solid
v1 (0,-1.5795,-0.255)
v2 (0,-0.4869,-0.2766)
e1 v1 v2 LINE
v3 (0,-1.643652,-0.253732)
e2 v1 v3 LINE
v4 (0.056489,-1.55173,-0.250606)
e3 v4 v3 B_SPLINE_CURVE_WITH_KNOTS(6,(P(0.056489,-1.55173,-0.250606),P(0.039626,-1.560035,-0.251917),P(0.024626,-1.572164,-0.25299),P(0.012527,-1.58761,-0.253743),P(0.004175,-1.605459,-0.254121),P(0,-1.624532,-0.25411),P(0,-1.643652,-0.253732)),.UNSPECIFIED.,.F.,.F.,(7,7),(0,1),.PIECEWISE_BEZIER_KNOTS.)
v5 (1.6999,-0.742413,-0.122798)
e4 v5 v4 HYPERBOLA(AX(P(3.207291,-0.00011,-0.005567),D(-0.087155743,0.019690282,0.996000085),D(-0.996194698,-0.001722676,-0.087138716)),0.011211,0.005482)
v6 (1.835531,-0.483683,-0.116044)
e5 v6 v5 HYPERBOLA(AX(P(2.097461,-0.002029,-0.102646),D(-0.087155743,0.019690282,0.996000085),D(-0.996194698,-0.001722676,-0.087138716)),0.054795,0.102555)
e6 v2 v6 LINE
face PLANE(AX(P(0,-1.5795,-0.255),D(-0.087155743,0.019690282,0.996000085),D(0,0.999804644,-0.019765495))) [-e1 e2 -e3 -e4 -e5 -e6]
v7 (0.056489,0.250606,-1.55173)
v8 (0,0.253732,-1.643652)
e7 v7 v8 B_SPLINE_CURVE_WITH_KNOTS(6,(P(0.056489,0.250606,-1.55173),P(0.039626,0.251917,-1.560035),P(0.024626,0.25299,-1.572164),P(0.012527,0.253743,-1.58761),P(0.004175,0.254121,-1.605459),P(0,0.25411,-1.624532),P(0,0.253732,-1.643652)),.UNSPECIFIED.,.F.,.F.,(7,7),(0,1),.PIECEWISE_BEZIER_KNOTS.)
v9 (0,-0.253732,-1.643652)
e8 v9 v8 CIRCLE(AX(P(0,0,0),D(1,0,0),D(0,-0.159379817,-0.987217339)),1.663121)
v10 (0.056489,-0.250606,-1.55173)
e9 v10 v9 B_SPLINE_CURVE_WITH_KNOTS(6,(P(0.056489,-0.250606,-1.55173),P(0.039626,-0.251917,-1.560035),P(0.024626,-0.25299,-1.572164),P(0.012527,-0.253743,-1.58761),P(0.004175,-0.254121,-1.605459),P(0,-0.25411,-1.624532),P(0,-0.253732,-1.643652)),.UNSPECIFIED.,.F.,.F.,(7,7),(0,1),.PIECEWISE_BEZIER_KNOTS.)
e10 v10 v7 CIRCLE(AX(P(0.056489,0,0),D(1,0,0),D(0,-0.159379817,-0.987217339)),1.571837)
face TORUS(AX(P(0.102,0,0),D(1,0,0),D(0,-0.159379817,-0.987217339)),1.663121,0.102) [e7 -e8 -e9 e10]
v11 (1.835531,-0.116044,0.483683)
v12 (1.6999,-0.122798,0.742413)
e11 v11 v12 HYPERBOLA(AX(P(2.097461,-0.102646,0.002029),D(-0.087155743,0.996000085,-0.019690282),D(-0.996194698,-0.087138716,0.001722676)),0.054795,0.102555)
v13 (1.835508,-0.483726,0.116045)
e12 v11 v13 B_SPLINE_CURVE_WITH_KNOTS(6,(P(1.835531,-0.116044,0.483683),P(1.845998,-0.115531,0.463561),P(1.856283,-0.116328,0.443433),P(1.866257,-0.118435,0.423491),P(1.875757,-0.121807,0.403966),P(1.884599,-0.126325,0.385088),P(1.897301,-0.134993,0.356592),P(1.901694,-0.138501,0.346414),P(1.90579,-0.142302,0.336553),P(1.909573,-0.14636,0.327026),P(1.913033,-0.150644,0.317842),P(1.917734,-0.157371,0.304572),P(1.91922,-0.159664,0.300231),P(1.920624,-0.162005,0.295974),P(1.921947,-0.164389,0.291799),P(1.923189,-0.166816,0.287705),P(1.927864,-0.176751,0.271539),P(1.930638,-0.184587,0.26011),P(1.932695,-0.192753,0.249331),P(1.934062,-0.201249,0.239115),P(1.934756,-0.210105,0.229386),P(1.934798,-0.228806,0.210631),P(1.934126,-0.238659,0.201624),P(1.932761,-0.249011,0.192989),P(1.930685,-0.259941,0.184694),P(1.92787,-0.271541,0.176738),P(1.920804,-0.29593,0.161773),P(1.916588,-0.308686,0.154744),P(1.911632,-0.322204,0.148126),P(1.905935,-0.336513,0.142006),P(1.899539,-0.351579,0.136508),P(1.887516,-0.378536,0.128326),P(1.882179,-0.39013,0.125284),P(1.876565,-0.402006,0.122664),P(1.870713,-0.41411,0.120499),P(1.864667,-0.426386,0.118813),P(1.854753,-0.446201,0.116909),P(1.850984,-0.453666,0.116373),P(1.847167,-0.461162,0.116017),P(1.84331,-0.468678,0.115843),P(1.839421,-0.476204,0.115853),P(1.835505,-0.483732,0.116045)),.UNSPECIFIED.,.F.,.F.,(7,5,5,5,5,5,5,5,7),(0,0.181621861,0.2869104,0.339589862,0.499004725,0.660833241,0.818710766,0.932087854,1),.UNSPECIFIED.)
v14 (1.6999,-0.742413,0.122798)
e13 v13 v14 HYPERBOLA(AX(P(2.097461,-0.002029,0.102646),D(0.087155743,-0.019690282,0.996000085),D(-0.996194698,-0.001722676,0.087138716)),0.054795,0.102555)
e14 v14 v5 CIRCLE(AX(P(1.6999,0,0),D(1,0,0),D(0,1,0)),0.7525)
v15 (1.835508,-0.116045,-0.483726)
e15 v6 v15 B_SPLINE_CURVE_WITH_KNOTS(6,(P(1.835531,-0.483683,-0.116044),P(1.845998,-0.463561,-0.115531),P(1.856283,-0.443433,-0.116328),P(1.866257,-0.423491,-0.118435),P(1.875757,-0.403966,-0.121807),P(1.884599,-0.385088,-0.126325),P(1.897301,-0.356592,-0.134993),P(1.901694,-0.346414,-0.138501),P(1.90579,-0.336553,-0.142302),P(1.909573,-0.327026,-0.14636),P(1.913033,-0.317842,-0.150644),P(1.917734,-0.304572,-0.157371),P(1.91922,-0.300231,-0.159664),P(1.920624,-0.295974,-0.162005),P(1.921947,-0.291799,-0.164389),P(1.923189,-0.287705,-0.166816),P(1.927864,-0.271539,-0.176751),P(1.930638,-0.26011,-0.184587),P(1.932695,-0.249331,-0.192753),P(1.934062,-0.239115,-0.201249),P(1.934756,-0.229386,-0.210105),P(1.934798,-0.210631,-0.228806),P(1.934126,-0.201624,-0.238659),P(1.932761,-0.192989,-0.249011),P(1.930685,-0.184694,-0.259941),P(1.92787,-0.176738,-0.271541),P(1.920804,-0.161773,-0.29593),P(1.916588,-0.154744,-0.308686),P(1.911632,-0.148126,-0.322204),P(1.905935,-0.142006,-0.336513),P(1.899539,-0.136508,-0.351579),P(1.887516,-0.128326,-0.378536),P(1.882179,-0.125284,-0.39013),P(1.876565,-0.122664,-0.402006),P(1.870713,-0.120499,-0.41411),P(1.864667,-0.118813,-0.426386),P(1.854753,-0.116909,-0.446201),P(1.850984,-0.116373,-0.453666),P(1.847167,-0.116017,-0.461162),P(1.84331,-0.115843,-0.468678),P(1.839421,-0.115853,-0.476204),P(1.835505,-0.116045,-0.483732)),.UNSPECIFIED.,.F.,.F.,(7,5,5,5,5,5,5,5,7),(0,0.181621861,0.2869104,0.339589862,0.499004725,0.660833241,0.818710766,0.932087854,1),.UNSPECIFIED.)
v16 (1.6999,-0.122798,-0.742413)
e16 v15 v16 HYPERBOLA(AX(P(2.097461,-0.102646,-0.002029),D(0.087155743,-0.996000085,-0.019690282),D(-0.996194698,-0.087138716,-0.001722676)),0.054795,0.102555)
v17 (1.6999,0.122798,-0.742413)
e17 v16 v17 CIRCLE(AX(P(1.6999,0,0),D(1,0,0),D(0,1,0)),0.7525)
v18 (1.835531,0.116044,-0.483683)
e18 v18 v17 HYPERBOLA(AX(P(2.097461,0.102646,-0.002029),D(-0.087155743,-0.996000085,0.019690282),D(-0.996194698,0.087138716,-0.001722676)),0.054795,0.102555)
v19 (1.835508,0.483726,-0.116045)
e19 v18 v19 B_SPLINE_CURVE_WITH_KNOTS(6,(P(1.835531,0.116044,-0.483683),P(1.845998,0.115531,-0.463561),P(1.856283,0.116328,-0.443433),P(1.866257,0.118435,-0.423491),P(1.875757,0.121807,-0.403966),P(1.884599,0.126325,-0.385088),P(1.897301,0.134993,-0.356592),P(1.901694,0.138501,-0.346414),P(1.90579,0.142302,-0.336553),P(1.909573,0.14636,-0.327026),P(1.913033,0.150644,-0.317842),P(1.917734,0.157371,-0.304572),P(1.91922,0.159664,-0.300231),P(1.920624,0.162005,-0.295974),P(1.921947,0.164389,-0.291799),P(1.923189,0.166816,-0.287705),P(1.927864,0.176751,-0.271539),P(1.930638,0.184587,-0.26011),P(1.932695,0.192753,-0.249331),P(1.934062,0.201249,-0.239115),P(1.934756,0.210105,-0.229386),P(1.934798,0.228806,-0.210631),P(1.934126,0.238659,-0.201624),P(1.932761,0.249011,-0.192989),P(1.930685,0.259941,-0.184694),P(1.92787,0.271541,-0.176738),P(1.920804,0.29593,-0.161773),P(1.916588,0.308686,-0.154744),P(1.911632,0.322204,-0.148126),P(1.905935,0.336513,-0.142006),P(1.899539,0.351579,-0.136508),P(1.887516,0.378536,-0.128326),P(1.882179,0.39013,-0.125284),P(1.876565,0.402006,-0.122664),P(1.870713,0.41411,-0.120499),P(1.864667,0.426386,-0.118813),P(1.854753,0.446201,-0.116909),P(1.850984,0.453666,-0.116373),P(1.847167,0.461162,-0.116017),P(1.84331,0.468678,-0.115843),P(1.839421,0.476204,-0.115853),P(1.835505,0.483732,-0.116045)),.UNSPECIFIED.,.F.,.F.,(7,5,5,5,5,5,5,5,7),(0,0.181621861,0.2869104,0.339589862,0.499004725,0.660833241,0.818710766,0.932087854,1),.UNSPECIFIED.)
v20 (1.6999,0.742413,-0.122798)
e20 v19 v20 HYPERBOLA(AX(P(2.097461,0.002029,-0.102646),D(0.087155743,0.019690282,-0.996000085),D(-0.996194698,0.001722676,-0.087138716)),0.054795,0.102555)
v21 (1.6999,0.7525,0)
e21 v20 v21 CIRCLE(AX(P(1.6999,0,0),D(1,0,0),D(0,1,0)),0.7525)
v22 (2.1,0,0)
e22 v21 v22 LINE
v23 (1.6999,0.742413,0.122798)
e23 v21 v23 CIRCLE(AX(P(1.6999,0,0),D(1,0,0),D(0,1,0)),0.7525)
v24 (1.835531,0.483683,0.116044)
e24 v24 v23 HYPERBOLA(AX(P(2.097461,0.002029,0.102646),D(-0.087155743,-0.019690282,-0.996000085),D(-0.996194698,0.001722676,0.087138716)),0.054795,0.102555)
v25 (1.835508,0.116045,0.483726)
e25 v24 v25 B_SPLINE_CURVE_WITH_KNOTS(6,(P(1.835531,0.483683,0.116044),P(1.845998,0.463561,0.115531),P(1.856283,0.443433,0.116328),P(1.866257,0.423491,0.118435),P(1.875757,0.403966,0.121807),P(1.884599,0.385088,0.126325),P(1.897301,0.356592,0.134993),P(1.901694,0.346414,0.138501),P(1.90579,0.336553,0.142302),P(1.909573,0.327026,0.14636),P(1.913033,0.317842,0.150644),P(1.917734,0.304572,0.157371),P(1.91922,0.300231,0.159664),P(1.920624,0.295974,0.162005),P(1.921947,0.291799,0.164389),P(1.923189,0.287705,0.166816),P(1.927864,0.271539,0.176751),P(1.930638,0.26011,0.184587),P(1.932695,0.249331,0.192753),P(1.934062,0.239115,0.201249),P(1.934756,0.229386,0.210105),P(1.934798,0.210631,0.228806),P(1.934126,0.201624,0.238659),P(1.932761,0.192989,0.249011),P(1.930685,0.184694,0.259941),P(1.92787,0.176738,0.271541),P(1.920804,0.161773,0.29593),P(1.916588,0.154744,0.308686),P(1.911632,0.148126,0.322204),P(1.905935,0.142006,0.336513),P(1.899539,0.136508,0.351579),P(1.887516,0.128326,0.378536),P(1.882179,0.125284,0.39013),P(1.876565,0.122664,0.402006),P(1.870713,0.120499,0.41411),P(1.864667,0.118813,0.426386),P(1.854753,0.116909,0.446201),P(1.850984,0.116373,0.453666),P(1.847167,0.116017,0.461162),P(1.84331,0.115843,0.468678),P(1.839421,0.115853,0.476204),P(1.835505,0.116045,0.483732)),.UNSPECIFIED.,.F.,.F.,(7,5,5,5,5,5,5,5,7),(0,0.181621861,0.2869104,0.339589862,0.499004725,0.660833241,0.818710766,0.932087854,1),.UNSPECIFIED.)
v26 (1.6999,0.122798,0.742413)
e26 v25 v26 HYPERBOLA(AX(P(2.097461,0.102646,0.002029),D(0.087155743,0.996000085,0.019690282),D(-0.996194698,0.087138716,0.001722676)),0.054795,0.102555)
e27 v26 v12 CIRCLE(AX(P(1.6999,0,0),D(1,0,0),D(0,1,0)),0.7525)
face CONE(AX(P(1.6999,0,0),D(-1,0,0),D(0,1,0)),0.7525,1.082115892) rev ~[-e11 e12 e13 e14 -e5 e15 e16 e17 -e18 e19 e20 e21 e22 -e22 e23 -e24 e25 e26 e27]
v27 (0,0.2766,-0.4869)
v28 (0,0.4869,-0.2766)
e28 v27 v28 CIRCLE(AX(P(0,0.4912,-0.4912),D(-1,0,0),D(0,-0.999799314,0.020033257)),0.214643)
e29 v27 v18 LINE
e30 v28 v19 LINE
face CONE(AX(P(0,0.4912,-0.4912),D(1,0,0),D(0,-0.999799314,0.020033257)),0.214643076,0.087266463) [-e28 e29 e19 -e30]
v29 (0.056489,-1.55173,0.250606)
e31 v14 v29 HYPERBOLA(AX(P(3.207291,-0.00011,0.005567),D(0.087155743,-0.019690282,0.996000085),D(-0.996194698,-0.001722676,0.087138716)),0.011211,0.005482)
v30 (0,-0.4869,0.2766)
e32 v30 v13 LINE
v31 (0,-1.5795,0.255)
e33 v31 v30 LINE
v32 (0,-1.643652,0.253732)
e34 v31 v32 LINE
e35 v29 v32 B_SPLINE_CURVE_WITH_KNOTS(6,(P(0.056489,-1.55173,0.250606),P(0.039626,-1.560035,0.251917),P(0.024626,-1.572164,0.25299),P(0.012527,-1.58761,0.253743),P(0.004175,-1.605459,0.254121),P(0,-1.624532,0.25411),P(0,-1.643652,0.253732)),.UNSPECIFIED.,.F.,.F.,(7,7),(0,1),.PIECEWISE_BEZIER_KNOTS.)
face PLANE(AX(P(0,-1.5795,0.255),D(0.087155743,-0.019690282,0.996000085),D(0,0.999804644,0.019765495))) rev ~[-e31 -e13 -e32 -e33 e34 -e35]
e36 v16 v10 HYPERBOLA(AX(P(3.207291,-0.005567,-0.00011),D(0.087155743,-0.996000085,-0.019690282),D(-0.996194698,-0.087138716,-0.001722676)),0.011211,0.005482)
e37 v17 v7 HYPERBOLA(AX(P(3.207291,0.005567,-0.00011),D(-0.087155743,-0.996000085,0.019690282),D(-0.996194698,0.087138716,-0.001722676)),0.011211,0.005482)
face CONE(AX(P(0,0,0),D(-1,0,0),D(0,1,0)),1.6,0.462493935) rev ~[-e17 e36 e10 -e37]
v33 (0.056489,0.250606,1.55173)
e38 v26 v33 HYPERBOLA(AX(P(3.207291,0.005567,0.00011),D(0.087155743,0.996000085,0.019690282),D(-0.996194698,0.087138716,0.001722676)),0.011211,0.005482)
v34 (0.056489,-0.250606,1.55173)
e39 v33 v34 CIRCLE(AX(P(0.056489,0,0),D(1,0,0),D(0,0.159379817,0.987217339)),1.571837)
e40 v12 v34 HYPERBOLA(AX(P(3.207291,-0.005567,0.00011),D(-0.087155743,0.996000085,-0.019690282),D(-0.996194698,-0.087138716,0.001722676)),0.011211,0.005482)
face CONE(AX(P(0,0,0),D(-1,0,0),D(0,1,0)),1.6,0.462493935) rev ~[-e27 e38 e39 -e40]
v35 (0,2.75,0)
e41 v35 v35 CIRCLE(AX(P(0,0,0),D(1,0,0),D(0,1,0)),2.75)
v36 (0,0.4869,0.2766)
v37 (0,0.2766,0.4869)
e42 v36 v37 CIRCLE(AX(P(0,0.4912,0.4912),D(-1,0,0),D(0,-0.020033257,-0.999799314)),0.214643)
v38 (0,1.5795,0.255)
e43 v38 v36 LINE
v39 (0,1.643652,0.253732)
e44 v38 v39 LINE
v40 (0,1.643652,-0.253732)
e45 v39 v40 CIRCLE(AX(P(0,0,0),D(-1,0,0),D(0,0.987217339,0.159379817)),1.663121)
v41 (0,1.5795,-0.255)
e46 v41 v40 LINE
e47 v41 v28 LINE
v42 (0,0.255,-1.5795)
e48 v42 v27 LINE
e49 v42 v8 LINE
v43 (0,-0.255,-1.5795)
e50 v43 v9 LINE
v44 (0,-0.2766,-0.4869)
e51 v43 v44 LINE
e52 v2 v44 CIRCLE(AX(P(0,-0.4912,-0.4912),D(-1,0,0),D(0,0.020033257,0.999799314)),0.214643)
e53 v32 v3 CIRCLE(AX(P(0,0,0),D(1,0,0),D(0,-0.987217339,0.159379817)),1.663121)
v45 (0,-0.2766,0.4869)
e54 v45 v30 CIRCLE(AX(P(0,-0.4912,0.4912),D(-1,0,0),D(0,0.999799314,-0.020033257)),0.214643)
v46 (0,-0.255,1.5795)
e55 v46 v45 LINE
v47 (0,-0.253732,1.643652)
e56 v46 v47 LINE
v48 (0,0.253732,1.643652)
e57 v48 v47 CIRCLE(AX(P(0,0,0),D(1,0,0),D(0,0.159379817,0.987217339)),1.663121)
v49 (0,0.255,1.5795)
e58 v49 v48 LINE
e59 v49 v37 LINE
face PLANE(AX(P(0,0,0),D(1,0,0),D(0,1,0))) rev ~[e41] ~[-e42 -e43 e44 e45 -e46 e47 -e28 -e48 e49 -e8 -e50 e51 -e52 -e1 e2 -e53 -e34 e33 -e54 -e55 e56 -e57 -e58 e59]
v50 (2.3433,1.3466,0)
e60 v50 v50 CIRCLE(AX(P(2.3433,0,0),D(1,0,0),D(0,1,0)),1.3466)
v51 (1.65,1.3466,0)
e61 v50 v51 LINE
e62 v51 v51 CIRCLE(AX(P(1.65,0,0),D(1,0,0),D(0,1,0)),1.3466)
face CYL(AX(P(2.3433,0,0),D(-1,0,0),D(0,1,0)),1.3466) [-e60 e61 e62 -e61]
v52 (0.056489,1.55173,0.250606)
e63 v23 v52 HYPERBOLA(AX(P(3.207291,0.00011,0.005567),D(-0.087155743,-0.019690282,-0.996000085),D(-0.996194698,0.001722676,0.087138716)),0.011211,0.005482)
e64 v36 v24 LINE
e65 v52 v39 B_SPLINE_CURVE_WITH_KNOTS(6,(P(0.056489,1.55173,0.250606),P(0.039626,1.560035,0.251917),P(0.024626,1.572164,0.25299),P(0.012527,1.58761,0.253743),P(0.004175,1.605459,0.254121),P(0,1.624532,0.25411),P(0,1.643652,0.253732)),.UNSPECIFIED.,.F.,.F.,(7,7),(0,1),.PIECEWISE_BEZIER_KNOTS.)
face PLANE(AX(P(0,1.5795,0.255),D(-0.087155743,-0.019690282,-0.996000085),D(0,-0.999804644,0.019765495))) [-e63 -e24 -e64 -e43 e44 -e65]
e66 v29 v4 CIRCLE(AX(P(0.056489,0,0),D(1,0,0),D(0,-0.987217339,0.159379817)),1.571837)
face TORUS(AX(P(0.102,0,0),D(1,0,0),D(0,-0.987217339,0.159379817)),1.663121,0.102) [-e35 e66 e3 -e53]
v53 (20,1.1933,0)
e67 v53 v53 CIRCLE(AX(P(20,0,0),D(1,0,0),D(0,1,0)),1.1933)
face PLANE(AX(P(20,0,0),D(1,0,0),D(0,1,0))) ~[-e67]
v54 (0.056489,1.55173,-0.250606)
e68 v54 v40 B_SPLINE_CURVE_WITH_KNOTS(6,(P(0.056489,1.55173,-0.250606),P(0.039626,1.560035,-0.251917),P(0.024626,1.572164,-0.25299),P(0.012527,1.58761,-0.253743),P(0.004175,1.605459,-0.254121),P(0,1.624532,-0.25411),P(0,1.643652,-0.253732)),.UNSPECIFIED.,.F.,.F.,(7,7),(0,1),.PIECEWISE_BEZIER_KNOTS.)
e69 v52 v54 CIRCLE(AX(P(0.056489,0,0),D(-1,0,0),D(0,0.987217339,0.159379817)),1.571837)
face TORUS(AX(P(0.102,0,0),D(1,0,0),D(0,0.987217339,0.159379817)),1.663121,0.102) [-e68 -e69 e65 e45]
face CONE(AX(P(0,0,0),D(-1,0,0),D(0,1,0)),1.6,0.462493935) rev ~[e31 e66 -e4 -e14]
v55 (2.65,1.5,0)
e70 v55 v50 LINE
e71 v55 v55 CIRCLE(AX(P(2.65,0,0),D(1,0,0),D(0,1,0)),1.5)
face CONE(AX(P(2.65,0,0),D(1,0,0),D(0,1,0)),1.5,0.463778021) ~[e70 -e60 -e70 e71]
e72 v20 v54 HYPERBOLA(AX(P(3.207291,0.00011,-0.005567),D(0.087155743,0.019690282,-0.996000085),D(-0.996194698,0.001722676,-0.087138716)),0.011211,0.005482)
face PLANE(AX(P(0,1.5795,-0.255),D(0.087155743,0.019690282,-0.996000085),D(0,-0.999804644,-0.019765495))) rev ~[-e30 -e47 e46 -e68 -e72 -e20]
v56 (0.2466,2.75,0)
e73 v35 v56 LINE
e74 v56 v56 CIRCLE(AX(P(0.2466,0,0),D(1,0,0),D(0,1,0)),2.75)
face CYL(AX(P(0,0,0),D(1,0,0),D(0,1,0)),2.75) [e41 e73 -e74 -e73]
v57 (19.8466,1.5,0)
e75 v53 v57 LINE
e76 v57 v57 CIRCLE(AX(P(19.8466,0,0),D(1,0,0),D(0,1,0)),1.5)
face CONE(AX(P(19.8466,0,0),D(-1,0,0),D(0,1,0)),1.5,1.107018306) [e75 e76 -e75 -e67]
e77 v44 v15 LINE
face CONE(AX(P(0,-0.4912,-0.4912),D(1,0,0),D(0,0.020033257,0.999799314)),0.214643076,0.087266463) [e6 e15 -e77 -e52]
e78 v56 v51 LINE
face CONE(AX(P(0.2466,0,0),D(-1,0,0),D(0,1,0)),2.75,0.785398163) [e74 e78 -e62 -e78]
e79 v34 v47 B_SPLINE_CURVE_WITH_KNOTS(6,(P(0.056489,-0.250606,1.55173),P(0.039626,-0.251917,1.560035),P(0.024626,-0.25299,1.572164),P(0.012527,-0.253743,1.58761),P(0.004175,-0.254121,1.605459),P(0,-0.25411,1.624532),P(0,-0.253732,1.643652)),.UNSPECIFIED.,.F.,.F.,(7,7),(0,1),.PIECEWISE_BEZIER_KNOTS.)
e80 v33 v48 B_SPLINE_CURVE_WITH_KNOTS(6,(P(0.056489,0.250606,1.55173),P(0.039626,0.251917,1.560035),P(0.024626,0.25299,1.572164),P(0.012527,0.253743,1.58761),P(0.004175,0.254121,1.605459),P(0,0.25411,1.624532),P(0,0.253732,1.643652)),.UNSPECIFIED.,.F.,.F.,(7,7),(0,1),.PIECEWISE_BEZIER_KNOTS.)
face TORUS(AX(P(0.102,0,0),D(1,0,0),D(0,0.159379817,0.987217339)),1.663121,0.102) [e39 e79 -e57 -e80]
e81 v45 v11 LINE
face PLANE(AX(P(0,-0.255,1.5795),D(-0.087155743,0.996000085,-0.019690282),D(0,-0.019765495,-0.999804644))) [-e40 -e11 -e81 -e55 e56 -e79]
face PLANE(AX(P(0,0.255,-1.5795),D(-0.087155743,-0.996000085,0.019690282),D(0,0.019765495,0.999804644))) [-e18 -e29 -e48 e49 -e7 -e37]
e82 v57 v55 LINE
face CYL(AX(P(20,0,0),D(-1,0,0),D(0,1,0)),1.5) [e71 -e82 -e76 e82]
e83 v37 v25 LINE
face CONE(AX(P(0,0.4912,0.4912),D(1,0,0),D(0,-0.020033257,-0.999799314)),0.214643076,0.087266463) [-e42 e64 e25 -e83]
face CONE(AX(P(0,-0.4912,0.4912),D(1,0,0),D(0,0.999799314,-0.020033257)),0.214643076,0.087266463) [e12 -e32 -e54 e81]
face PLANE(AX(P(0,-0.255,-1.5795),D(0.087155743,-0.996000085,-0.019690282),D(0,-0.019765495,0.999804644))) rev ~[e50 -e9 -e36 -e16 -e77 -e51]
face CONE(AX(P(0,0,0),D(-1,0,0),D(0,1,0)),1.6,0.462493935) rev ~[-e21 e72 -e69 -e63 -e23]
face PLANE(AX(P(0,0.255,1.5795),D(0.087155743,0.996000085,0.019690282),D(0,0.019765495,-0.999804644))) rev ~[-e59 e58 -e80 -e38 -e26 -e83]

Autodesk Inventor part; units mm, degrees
ref_plane "YZ Plane" through (0, 0, 0) normal (1, 0, 0) x (0, 1, 0)
ref_plane "XZ Plane" through (0, 0, 0) normal (0, 1, 0) x (-1, 0, 0)
sketch "Эскиз1" plane through (0, 0, 0) normal (0, 0, 1) x (1, 0, 0)
  line L0 (2.1, 0) -> (20, 0)
  line L1 (20, 0) -> (20, 1.5)
  line L2 (20, 1.5) -> (2.65, 1.5)
  line L3 (2.65, 1.5) -> (2.3433, 1.3466)
  line L4 (2.3433, 1.3466) -> (1.65, 1.3466)
  line L5 (0, 2.75) -> (0, 1.6)
  line L6 (0, 1.6) -> (1.6999, 0.7525)
  line L7 (1.6999, 0.7525) -> (2.1, 0)
  line L8 (-4, 0) -> (24, 0) projected
  line L9 (0, -0.55) -> (0, 3.3) projected
  line L10 (0, 2.75) -> (0.2466, 2.75)
  line L11 (0.2466, 2.75) -> (1.65, 1.3466)
  line L12 (2.65, 1.5) -> (1.4966, 1.5) construction
  dimension "d1" = 17.35
  dimension "d2" = 3
  dimension "d3" = 2.6933
  dimension "d4" = 3.2
  dimension "d5" = 26.5
  dimension "d6" = 62
  dimension "d7" = 2.1
  dimension "d8" = 0.3067
  dimension "d12" = 5.5
  dimension "d13" = 45
  dimension "d15" = 20
  dimension "d24" = 1.65
revolve "Базовый элемент" add sketch "Эскиз1" angle 360 about axis through (2.1, 0, 0) along (1, 0, 0) contours L7 L6 L5 L10 L11 L4 L3 L2 L1 L0
sketch "Эскиз2" plane through (0, 0, 0) normal (-1, 0, 0) x (0, 0, 1)
  line L0 (0, 1.6) -> (0, 0) construction
  line L1 (0, 0) -> (1.6, 0) construction
  arc A0 (0.48, 0) -> (0, 0.48) centre (0, 0) ccw construction
  arc A1 (0.56, 0) -> (0, 0.56) centre (0, 0) ccw construction
  arc A2 (1.5795, 0.255) -> (0.255, 1.5795) centre (0, 0) ccw
  line L2 (0, 0) -> (1.1314, 1.1314) construction
  line L3 (0.255, 1.5795) -> (0.2766, 0.4869)
  line L4 (1.5795, 0.255) -> (0.4869, 0.2766)
  arc A3 (0.255, 1.5795) -> (0, 1.6) centre (0, 0) ccw
  arc A4 (1.6, 0) -> (1.5795, 0.255) centre (0, 0) ccw
  line L5 (0, -3.85) -> (0, 3.85) projected
  line L6 (-3.85, 0) -> (3.85, 0) projected
  arc A5 (0.255, -1.5795) -> (1.5795, -0.255) centre (0, 0) ccw
  line L7 (0.255, -1.5795) -> (0.2766, -0.4869)
  line L8 (1.5795, -0.255) -> (0.4869, -0.2766)
  arc A6 (0, -1.6) -> (0.255, -1.5795) centre (0, 0) ccw
  arc A7 (1.5795, -0.255) -> (1.6, 0) centre (0, 0) ccw
  arc A8 (-0.255, 1.5795) -> (-1.5795, 0.255) centre (0, 0) ccw
  line L9 (-0.255, 1.5795) -> (-0.2766, 0.4869)
  line L10 (-1.5795, 0.255) -> (-0.4869, 0.2766)
  arc A9 (0, 1.6) -> (-0.255, 1.5795) centre (0, 0) ccw
  arc A10 (-1.5795, 0.255) -> (-1.6, 0) centre (0, 0) ccw
  arc A11 (-0.255, -1.5795) -> (0, -1.6) centre (0, 0) ccw
  arc A12 (-1.5795, -0.255) -> (-0.255, -1.5795) centre (0, 0) ccw
  arc A13 (-1.6, 0) -> (-1.5795, -0.255) centre (0, 0) ccw
  line L11 (-1.5795, -0.255) -> (-0.4869, -0.2766)
  line L12 (-0.255, -1.5795) -> (-0.2766, -0.4869)
  arc A14 (0.2766, 0.4869) -> (0.4869, 0.2766) centre (0.4912, 0.4912) ccw
  arc A15 (0.4869, -0.2766) -> (0.2766, -0.4869) centre (0.4912, -0.4912) ccw
  arc A16 (-0.4869, 0.2766) -> (-0.2766, 0.4869) centre (-0.4912, 0.4912) ccw
  arc A17 (-0.2766, -0.4869) -> (-0.4869, -0.2766) centre (-0.4912, -0.4912) ccw
  point P0 (1.1314, -1.1314)
  point P1 (-1.1314, 1.1314)
  point P2 (-1.1314, -1.1314)
  dimension "d17" = 0.96
  dimension "d18" = 1.12
  dimension "d19" = 3.2
  dimension "d20" = 45
  dimension "d21" = 0.255
extrude "Паз" add sketch "Эскиз2" against normal up to next draft 5 contours L4 A14 L3 A2 | A5 L7 A15 L8 | L9 A16 L10 A8 | A12 L11 A17 L12
fillet "Сопряжение1" radius 0.102 4 edges at (0, 1.6, 0) (0, 0, -1.6) (0, -1.6, 0) (0, 0, 1.6)
thread "Резьба" size "M3x0.5" class "6g" standard "ISO Metric profile" length 17.35
chamfer "Фаска1" distance 0.3067 distance2 0.1534 1 edges at (20, -1.5, 0) measured on face at (20, 0.1367, 0.3027)
ref_plane "Work Plane2" through (3.35, 0, 0) normal (0, 0, -1) x (1, 0, 0)
equation "\"d1\" = GEL"
equation "\"d2\" = GD"
equation "\"d3\" = BDM"
equation "\"d4\" = SDM"
equation "\"d7\" = INTI"
equation "\"d8\" = GAL"
equation "\"d12\" = KOD"
equation "\"d13\" = 0.5 * SEWI"
equation "\"d15\" = NLG"
equation "\"d24\" = KOH"
equation "\"d17\" = 0.3 * SDM"
equation "\"d18\" = 0.35 * SDM"
equation "\"d19\" = SDM"
equation "\"d21\" = 0.5 * SBR"
equation "\"d23\" = 0.2 * SBR"
equation "\"d10\" = GEL"
equation "\"d25\" = -0.5 * SPD + 0.5 * GD"
equation "\"d26\" = 0.5 * GAL"
equation "\"NLG\" = 20"
equation "\"GEL\" = 17.35"
equation "\"GAL\" = 0.61345 * PTC"
equation "\"SPD\" = NND - 1.2269 * PTC"
equation "\"KOD\" = 5.5"
equation "\"KOH\" = 1.65"
equation "\"SBR\" = 0.51"
equation "\"INTI\" = 2.1"
equation "\"SDM\" = 3.2"
equation "\"GD\" = NND"
equation "\"BDM\" = NND - GAL"
equation "\"SEWI\" = 90deg"
equation "\"d9\" = SDM"
equation "\"GUL\" = 0.61345 * PTC"
equation "\"TOA\" = 30deg"
equation "\"EPV\" = 3.15"
equation "\"THREADDIA\" = 3"
equation "\"PTC\" = 0.5"
equation "\"NND\" = 3"
equation "\"GD1\" = THREADDIA - 1.2269 * PTC"
properties part number "ISO 7046-1 - M3 x 20 - 4.8 - H" material "Сталь"
